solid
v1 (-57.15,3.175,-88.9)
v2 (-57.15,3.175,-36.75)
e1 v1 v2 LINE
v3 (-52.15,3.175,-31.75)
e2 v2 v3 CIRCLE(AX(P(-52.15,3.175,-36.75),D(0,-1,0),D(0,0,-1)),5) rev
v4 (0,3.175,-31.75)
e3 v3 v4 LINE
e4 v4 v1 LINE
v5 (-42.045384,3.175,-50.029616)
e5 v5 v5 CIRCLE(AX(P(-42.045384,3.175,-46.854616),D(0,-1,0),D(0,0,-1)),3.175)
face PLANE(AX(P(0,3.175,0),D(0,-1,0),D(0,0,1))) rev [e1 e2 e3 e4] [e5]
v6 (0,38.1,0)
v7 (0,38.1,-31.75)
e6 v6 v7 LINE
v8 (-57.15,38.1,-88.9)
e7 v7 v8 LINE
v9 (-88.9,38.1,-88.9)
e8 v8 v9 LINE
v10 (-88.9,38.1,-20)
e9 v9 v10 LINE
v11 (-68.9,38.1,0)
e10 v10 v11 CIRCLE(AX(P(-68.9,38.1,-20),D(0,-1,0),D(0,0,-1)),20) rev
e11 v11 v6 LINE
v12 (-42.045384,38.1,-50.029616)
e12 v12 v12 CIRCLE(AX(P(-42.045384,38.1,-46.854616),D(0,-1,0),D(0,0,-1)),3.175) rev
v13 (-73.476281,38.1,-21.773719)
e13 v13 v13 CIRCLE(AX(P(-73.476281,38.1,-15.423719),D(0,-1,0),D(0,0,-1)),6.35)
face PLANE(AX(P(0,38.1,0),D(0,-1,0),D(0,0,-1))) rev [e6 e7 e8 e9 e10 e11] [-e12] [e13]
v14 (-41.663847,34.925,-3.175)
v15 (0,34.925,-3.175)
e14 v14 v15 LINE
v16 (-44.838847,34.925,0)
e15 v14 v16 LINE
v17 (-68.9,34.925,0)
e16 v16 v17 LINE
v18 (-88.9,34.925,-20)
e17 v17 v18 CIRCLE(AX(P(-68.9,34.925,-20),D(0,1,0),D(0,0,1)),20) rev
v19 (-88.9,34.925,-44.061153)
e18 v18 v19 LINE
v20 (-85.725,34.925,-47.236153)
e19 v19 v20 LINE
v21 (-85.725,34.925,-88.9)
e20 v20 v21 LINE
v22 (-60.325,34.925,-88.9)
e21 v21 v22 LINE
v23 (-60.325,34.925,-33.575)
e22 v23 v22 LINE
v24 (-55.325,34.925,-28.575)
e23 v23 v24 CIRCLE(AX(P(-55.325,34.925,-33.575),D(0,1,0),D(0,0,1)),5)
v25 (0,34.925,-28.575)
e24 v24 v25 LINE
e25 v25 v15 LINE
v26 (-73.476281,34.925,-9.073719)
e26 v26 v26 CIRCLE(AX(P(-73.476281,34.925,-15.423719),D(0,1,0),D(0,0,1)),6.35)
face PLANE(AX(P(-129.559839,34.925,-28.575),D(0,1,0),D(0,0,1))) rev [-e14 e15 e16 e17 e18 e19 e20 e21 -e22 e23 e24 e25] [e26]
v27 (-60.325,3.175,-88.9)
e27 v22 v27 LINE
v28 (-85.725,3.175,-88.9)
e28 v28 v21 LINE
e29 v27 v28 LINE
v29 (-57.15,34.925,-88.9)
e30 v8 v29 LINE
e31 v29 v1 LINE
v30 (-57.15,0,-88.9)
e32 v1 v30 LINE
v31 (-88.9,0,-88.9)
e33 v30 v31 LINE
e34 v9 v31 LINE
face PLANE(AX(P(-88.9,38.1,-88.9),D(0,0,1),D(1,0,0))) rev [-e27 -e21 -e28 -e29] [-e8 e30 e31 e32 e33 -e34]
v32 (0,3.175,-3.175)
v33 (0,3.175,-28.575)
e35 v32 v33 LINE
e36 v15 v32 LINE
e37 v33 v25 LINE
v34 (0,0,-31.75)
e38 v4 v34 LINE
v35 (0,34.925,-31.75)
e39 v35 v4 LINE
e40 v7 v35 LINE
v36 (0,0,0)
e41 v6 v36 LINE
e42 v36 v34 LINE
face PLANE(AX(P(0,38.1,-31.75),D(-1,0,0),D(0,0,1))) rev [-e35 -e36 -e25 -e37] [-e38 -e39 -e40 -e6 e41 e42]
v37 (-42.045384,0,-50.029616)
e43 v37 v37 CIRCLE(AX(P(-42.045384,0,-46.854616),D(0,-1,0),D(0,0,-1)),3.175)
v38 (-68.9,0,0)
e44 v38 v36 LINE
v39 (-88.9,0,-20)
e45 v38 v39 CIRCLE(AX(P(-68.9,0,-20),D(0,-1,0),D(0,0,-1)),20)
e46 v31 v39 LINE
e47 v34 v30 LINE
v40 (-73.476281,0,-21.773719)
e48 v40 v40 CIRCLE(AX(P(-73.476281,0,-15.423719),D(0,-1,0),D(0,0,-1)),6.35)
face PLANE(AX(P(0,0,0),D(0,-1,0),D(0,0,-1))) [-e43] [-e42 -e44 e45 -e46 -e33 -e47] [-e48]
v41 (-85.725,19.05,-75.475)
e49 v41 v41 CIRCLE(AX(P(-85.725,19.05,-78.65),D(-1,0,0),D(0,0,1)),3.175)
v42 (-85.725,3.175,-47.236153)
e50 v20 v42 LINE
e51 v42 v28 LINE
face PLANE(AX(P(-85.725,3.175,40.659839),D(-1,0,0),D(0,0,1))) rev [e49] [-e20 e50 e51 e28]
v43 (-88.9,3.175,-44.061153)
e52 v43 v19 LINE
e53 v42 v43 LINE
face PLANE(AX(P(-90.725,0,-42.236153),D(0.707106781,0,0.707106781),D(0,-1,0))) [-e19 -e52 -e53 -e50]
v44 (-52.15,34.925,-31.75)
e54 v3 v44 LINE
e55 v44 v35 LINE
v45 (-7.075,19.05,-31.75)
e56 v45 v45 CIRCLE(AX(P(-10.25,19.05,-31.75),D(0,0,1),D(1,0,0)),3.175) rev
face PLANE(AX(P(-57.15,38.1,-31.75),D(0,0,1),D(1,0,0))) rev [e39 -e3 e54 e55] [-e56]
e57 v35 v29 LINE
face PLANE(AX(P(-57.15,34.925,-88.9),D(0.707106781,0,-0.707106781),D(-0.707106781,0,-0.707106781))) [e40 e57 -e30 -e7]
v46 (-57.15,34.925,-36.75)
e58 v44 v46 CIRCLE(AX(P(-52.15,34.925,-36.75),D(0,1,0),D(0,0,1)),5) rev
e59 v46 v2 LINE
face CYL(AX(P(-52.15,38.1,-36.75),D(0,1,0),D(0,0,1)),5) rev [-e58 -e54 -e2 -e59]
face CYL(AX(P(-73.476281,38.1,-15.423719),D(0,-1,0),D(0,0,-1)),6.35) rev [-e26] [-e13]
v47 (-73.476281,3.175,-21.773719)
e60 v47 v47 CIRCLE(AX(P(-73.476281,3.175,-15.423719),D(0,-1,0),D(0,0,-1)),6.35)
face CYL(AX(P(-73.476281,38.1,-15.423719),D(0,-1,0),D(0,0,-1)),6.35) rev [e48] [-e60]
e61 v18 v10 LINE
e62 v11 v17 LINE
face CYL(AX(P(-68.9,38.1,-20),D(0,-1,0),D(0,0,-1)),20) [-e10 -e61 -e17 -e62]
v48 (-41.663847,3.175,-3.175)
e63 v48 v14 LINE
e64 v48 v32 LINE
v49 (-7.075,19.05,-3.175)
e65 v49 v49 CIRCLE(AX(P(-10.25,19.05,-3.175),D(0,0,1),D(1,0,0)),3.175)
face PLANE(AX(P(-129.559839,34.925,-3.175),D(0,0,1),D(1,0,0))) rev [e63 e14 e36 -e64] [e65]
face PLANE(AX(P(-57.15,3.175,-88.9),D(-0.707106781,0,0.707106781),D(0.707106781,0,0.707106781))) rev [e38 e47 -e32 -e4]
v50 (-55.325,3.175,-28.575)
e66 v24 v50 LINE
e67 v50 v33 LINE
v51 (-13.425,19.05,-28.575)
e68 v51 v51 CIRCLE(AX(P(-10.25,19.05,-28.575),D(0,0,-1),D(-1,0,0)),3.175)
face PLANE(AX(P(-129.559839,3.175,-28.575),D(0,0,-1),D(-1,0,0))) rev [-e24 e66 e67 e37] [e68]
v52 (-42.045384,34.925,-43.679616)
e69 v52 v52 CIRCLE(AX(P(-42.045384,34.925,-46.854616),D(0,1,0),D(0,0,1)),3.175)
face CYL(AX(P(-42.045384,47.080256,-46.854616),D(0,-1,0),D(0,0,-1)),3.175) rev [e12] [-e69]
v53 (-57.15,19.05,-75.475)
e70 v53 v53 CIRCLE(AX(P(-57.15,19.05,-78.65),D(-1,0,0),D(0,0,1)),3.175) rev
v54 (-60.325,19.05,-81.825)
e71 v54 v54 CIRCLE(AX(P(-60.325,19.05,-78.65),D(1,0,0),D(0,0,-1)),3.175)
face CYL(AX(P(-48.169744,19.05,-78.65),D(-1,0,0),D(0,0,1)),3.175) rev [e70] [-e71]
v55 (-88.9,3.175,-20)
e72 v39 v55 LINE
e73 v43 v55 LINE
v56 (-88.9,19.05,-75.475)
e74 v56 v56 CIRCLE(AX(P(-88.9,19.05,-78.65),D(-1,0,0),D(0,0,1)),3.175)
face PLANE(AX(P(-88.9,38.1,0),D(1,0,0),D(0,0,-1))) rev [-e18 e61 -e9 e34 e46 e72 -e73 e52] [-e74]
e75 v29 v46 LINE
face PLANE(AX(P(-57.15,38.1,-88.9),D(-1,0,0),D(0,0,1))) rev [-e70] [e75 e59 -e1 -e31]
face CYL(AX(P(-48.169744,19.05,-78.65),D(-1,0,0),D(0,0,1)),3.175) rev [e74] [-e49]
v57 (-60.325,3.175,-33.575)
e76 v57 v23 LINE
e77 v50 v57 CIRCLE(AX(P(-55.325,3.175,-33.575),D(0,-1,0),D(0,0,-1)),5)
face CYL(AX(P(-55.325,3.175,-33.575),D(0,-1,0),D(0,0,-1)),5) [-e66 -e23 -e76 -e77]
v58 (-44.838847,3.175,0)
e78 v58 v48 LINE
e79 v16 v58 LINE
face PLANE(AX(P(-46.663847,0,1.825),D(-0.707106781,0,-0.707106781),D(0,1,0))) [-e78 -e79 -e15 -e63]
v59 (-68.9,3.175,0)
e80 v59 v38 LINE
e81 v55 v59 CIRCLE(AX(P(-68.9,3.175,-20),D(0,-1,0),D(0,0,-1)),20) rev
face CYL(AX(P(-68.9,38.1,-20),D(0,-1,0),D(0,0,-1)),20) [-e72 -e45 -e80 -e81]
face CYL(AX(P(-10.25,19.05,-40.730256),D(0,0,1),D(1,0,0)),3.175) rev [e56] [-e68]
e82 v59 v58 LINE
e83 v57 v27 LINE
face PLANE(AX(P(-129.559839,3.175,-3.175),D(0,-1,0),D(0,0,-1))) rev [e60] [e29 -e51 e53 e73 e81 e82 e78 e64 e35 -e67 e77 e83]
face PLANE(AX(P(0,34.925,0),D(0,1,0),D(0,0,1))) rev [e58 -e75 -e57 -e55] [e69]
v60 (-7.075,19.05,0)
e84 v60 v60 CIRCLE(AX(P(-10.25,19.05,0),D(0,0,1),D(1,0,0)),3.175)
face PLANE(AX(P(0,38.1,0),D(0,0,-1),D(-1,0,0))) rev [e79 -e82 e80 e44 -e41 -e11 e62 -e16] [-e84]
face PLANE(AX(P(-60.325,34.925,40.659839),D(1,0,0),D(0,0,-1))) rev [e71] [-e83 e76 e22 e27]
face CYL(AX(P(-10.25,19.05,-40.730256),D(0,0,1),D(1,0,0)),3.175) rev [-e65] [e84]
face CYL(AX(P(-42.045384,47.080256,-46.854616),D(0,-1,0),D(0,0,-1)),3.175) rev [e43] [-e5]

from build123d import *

# Parameters (mm, degrees)
BOSS_EXTRUDE1_DEPTH     = 38.1
SKETCH2_W               = 25.4
SKETCH2_H               = 31.75
CUT_EXTRUDE1_DEPTH      = 88.9
CUT_EXTRUDE2_REACH      = 133.37
SKETCH3_W               = 25.4
SKETCH3_H               = 31.75
CUT_EXTRUDE3_START      = -62.861793
SKETCH4_W               = 75
SKETCH4_H               = 31.75
CUT_EXTRUDE3_DEPTH      = 28.575
FILLET4_R               = 20
CUT_EXTRUDE8_DEPTH      = 131.484388453
CUT_EXTRUDE8_DEPTH_BACK = 131.484388453
SKETCH8_R               = 6.35
BOSS_EXTRUDE2_DEPTH     = 3.175
CUT_EXTRUDE10_REACH     = 133.37
SKETCH35_R              = 3.175
CUT_EXTRUDE11_REACH     = 133.37
SKETCH36_R              = 3.175
FILLET8_R               = 5
CHAMFER1_SIZE           = 10
CHAMFER1_SIZE_2         = 7.071067812
CUT_EXTRUDE12_REACH     = 133.37
SKETCH37_R              = 3.175


with BuildPart() as part:
    # Sketch1 → Boss-Extrude1 (new body)
    with BuildSketch(Plane(origin=(0, 0, 0), x_dir=(1, 0, 0), z_dir=(0, 1, 0))):
        Polygon((0, 0), (-88.9, 0), (-88.9, 88.9), (-57.15, 88.9), (-57.15, 31.75), (0, 31.75), align=None)
    extrude(amount=BOSS_EXTRUDE1_DEPTH)

    # Sketch2 → Cut-Extrude1 (cut)
    with BuildSketch(Plane(origin=(0, 0, 0), x_dir=(0, 0, -1), z_dir=(1, 0, 0))):
        with Locations((15.875, 19.05)):
            Rectangle(SKETCH2_W, SKETCH2_H)
    extrude(amount=-CUT_EXTRUDE1_DEPTH, mode=Mode.SUBTRACT)

    # Cut-Extrude2: up to this face of the body (flat: up to its plane)
    cut_extrude2_end = Plane(part.part.faces().sort_by_distance((-44.45, 19.05, 0))[0])
    # Sketch3 → Cut-Extrude2 (cut, up to the picked face)
    with BuildSketch(Plane(origin=(0, 0, -88.9), x_dir=(-1, 0, 0), z_dir=(0, 0, -1)), mode=Mode.PRIVATE) as cut_extrude2_sk1:
        with Locations((73.025, 19.05)):
            Rectangle(SKETCH3_W, SKETCH3_H)
    cut_extrude2_tool1 = split(extrude(cut_extrude2_sk1.sketch, amount=-CUT_EXTRUDE2_REACH, mode=Mode.PRIVATE), bisect_by=cut_extrude2_end, keep=Keep.BOTH, mode=Mode.PRIVATE)
    add(cut_extrude2_tool1.solids().sort_by(Axis((-73.025, 19.05, -88.9), (0, 0, 1)))[0], mode=Mode.SUBTRACT)

    # Sketch4 → Cut-Extrude3 (cut)
    with BuildSketch(Plane(origin=(0, 0, 0), x_dir=(-0.7071067811865475, 0, -0.7071067811865476), z_dir=(0.7071067811865476, 0, -0.7071067811865475)).offset(CUT_EXTRUDE3_START)):
        with Locations((62.861792847, 19.05)):
            Rectangle(SKETCH4_W, SKETCH4_H)
    extrude(amount=CUT_EXTRUDE3_DEPTH, mode=Mode.SUBTRACT)

    # Fillet4
    fillet4_edges = [part.edges().sort_by_distance(p)[0] for p in [
        (-88.9, 36.5125, 0),
        (-88.9, 1.5875, 0),
    ]]
    fillet(fillet4_edges, radius=FILLET4_R)

    # Sketch8 → Cut-Extrude8 (cut, two sides: drawn at the far end of the back side and taken through both)
    with BuildSketch(Plane.XZ.offset(-34.925).offset(-CUT_EXTRUDE8_DEPTH_BACK)):
        with Locations(Location((-73.476280605, -15.423719395, 0), (0, 0, 270))):
            Circle(SKETCH8_R)
    extrude(amount=CUT_EXTRUDE8_DEPTH + CUT_EXTRUDE8_DEPTH_BACK, mode=Mode.SUBTRACT)

    # Sketch29 → Boss-Extrude2 (add)
    with BuildSketch(Plane(origin=(0, 38.1, 0), x_dir=(1, 0, 0), z_dir=(0, 1, 0))):
        Polygon((-57.15, 88.9), (0, 31.75), (-57.15, 31.75), align=None)
    boss_extrude2 = extrude(amount=-BOSS_EXTRUDE2_DEPTH)

    # Cut-Extrude10: up to this face of the body (flat: up to its plane)
    cut_extrude10_end = Plane(part.part.faces().sort_by_distance((-57.15, 17.4625, -60.325))[0])
    # Sketch35 → Cut-Extrude10 (cut, up to the picked face)
    with BuildSketch(Plane.ZY.offset(88.9), mode=Mode.PRIVATE) as cut_extrude10_sk1:
        with Locations((-78.65, 19.05)):
            Circle(SKETCH35_R)
    cut_extrude10_tool1 = split(extrude(cut_extrude10_sk1.sketch, amount=-CUT_EXTRUDE10_REACH, mode=Mode.PRIVATE), bisect_by=cut_extrude10_end, keep=Keep.BOTH, mode=Mode.PRIVATE)
    add(cut_extrude10_tool1.solids().sort_by(Axis((-88.9, 19.05, -78.65), (1, 0, 0)))[0], mode=Mode.SUBTRACT)

    # Cut-Extrude11: up to this face of the body (flat: up to its plane)
    cut_extrude11_end = Plane(part.part.faces().sort_by_distance((-28.575, 17.4625, -31.75))[0])
    # Sketch36 → Cut-Extrude11 (cut, up to the picked face)
    with BuildSketch(Plane.XY, mode=Mode.PRIVATE) as cut_extrude11_sk1:
        with Locations((-10.25, 19.05)):
            Circle(SKETCH36_R)
    cut_extrude11_tool1 = split(extrude(cut_extrude11_sk1.sketch, amount=-CUT_EXTRUDE11_REACH, mode=Mode.PRIVATE), bisect_by=cut_extrude11_end, keep=Keep.BOTH, mode=Mode.PRIVATE)
    add(cut_extrude11_tool1.solids().sort_by(Axis((-10.25, 19.05, 0), (0, 0, -1)))[0], mode=Mode.SUBTRACT)

    # Mirror1: Boss-Extrude2 across plane
    add(boss_extrude2.mirror(Plane(origin=(0, 19.05, 0), x_dir=(0, 0, 1), z_dir=(0, -1, 0))))

    # Fillet8
    fillet8_edges = [part.edges().sort_by_distance(p)[0] for p in [
        (-57.15, 19.05, -31.75),
        (-60.325, 19.05, -28.575),
    ]]
    fillet(fillet8_edges, radius=FILLET8_R)

    # Chamfer1
    # the kernel refuses this chamfer: 10, 7.071067812 mm, written as the material it takes off along each edge
    with BuildSketch(Plane(origin=(-51.663847671, 3.175, -3.175), x_dir=(0.9996219169112968, 0, -0.027495876610586317), z_dir=(0, 1, 0)), Plane(origin=(-85.725, 34.925, -37.236152329), x_dir=(0.027495876610586317, 0, -0.9996219169112968), z_dir=(0, -1, 0))) as chamfer1_piece_1:
        Polygon((CHAMFER1_SIZE * 0.999621916911, -CHAMFER1_SIZE * 0.0274958766106), (CHAMFER1_SIZE_2 * 0.687396915252, -CHAMFER1_SIZE_2 * 0.726281956863), (0, 0), align=None)
    extrude(amount=31.75, mode=Mode.SUBTRACT)

    # Cut-Extrude12: up to this face of the body (flat: up to its plane)
    cut_extrude12_end = Plane(part.part.faces().sort_by_distance((-50.123943702, 38.1, -38.776056298))[0])
    # Sketch37 → Cut-Extrude12 (cut, up to the picked face)
    with BuildSketch(Plane.XZ, mode=Mode.PRIVATE) as cut_extrude12_sk1:
        with Locations(Location((-42.045384182, -46.854615818, 0), (0, 0, 270))):
            Circle(SKETCH37_R)
    cut_extrude12_tool1 = split(extrude(cut_extrude12_sk1.sketch, amount=-CUT_EXTRUDE12_REACH, mode=Mode.PRIVATE), bisect_by=cut_extrude12_end, keep=Keep.BOTH, mode=Mode.PRIVATE)
    add(cut_extrude12_tool1.solids().sort_by(Axis((-42.045384, 0, -46.854616), (0, 1, 0)))[0], mode=Mode.SUBTRACT)


solid = part.part
